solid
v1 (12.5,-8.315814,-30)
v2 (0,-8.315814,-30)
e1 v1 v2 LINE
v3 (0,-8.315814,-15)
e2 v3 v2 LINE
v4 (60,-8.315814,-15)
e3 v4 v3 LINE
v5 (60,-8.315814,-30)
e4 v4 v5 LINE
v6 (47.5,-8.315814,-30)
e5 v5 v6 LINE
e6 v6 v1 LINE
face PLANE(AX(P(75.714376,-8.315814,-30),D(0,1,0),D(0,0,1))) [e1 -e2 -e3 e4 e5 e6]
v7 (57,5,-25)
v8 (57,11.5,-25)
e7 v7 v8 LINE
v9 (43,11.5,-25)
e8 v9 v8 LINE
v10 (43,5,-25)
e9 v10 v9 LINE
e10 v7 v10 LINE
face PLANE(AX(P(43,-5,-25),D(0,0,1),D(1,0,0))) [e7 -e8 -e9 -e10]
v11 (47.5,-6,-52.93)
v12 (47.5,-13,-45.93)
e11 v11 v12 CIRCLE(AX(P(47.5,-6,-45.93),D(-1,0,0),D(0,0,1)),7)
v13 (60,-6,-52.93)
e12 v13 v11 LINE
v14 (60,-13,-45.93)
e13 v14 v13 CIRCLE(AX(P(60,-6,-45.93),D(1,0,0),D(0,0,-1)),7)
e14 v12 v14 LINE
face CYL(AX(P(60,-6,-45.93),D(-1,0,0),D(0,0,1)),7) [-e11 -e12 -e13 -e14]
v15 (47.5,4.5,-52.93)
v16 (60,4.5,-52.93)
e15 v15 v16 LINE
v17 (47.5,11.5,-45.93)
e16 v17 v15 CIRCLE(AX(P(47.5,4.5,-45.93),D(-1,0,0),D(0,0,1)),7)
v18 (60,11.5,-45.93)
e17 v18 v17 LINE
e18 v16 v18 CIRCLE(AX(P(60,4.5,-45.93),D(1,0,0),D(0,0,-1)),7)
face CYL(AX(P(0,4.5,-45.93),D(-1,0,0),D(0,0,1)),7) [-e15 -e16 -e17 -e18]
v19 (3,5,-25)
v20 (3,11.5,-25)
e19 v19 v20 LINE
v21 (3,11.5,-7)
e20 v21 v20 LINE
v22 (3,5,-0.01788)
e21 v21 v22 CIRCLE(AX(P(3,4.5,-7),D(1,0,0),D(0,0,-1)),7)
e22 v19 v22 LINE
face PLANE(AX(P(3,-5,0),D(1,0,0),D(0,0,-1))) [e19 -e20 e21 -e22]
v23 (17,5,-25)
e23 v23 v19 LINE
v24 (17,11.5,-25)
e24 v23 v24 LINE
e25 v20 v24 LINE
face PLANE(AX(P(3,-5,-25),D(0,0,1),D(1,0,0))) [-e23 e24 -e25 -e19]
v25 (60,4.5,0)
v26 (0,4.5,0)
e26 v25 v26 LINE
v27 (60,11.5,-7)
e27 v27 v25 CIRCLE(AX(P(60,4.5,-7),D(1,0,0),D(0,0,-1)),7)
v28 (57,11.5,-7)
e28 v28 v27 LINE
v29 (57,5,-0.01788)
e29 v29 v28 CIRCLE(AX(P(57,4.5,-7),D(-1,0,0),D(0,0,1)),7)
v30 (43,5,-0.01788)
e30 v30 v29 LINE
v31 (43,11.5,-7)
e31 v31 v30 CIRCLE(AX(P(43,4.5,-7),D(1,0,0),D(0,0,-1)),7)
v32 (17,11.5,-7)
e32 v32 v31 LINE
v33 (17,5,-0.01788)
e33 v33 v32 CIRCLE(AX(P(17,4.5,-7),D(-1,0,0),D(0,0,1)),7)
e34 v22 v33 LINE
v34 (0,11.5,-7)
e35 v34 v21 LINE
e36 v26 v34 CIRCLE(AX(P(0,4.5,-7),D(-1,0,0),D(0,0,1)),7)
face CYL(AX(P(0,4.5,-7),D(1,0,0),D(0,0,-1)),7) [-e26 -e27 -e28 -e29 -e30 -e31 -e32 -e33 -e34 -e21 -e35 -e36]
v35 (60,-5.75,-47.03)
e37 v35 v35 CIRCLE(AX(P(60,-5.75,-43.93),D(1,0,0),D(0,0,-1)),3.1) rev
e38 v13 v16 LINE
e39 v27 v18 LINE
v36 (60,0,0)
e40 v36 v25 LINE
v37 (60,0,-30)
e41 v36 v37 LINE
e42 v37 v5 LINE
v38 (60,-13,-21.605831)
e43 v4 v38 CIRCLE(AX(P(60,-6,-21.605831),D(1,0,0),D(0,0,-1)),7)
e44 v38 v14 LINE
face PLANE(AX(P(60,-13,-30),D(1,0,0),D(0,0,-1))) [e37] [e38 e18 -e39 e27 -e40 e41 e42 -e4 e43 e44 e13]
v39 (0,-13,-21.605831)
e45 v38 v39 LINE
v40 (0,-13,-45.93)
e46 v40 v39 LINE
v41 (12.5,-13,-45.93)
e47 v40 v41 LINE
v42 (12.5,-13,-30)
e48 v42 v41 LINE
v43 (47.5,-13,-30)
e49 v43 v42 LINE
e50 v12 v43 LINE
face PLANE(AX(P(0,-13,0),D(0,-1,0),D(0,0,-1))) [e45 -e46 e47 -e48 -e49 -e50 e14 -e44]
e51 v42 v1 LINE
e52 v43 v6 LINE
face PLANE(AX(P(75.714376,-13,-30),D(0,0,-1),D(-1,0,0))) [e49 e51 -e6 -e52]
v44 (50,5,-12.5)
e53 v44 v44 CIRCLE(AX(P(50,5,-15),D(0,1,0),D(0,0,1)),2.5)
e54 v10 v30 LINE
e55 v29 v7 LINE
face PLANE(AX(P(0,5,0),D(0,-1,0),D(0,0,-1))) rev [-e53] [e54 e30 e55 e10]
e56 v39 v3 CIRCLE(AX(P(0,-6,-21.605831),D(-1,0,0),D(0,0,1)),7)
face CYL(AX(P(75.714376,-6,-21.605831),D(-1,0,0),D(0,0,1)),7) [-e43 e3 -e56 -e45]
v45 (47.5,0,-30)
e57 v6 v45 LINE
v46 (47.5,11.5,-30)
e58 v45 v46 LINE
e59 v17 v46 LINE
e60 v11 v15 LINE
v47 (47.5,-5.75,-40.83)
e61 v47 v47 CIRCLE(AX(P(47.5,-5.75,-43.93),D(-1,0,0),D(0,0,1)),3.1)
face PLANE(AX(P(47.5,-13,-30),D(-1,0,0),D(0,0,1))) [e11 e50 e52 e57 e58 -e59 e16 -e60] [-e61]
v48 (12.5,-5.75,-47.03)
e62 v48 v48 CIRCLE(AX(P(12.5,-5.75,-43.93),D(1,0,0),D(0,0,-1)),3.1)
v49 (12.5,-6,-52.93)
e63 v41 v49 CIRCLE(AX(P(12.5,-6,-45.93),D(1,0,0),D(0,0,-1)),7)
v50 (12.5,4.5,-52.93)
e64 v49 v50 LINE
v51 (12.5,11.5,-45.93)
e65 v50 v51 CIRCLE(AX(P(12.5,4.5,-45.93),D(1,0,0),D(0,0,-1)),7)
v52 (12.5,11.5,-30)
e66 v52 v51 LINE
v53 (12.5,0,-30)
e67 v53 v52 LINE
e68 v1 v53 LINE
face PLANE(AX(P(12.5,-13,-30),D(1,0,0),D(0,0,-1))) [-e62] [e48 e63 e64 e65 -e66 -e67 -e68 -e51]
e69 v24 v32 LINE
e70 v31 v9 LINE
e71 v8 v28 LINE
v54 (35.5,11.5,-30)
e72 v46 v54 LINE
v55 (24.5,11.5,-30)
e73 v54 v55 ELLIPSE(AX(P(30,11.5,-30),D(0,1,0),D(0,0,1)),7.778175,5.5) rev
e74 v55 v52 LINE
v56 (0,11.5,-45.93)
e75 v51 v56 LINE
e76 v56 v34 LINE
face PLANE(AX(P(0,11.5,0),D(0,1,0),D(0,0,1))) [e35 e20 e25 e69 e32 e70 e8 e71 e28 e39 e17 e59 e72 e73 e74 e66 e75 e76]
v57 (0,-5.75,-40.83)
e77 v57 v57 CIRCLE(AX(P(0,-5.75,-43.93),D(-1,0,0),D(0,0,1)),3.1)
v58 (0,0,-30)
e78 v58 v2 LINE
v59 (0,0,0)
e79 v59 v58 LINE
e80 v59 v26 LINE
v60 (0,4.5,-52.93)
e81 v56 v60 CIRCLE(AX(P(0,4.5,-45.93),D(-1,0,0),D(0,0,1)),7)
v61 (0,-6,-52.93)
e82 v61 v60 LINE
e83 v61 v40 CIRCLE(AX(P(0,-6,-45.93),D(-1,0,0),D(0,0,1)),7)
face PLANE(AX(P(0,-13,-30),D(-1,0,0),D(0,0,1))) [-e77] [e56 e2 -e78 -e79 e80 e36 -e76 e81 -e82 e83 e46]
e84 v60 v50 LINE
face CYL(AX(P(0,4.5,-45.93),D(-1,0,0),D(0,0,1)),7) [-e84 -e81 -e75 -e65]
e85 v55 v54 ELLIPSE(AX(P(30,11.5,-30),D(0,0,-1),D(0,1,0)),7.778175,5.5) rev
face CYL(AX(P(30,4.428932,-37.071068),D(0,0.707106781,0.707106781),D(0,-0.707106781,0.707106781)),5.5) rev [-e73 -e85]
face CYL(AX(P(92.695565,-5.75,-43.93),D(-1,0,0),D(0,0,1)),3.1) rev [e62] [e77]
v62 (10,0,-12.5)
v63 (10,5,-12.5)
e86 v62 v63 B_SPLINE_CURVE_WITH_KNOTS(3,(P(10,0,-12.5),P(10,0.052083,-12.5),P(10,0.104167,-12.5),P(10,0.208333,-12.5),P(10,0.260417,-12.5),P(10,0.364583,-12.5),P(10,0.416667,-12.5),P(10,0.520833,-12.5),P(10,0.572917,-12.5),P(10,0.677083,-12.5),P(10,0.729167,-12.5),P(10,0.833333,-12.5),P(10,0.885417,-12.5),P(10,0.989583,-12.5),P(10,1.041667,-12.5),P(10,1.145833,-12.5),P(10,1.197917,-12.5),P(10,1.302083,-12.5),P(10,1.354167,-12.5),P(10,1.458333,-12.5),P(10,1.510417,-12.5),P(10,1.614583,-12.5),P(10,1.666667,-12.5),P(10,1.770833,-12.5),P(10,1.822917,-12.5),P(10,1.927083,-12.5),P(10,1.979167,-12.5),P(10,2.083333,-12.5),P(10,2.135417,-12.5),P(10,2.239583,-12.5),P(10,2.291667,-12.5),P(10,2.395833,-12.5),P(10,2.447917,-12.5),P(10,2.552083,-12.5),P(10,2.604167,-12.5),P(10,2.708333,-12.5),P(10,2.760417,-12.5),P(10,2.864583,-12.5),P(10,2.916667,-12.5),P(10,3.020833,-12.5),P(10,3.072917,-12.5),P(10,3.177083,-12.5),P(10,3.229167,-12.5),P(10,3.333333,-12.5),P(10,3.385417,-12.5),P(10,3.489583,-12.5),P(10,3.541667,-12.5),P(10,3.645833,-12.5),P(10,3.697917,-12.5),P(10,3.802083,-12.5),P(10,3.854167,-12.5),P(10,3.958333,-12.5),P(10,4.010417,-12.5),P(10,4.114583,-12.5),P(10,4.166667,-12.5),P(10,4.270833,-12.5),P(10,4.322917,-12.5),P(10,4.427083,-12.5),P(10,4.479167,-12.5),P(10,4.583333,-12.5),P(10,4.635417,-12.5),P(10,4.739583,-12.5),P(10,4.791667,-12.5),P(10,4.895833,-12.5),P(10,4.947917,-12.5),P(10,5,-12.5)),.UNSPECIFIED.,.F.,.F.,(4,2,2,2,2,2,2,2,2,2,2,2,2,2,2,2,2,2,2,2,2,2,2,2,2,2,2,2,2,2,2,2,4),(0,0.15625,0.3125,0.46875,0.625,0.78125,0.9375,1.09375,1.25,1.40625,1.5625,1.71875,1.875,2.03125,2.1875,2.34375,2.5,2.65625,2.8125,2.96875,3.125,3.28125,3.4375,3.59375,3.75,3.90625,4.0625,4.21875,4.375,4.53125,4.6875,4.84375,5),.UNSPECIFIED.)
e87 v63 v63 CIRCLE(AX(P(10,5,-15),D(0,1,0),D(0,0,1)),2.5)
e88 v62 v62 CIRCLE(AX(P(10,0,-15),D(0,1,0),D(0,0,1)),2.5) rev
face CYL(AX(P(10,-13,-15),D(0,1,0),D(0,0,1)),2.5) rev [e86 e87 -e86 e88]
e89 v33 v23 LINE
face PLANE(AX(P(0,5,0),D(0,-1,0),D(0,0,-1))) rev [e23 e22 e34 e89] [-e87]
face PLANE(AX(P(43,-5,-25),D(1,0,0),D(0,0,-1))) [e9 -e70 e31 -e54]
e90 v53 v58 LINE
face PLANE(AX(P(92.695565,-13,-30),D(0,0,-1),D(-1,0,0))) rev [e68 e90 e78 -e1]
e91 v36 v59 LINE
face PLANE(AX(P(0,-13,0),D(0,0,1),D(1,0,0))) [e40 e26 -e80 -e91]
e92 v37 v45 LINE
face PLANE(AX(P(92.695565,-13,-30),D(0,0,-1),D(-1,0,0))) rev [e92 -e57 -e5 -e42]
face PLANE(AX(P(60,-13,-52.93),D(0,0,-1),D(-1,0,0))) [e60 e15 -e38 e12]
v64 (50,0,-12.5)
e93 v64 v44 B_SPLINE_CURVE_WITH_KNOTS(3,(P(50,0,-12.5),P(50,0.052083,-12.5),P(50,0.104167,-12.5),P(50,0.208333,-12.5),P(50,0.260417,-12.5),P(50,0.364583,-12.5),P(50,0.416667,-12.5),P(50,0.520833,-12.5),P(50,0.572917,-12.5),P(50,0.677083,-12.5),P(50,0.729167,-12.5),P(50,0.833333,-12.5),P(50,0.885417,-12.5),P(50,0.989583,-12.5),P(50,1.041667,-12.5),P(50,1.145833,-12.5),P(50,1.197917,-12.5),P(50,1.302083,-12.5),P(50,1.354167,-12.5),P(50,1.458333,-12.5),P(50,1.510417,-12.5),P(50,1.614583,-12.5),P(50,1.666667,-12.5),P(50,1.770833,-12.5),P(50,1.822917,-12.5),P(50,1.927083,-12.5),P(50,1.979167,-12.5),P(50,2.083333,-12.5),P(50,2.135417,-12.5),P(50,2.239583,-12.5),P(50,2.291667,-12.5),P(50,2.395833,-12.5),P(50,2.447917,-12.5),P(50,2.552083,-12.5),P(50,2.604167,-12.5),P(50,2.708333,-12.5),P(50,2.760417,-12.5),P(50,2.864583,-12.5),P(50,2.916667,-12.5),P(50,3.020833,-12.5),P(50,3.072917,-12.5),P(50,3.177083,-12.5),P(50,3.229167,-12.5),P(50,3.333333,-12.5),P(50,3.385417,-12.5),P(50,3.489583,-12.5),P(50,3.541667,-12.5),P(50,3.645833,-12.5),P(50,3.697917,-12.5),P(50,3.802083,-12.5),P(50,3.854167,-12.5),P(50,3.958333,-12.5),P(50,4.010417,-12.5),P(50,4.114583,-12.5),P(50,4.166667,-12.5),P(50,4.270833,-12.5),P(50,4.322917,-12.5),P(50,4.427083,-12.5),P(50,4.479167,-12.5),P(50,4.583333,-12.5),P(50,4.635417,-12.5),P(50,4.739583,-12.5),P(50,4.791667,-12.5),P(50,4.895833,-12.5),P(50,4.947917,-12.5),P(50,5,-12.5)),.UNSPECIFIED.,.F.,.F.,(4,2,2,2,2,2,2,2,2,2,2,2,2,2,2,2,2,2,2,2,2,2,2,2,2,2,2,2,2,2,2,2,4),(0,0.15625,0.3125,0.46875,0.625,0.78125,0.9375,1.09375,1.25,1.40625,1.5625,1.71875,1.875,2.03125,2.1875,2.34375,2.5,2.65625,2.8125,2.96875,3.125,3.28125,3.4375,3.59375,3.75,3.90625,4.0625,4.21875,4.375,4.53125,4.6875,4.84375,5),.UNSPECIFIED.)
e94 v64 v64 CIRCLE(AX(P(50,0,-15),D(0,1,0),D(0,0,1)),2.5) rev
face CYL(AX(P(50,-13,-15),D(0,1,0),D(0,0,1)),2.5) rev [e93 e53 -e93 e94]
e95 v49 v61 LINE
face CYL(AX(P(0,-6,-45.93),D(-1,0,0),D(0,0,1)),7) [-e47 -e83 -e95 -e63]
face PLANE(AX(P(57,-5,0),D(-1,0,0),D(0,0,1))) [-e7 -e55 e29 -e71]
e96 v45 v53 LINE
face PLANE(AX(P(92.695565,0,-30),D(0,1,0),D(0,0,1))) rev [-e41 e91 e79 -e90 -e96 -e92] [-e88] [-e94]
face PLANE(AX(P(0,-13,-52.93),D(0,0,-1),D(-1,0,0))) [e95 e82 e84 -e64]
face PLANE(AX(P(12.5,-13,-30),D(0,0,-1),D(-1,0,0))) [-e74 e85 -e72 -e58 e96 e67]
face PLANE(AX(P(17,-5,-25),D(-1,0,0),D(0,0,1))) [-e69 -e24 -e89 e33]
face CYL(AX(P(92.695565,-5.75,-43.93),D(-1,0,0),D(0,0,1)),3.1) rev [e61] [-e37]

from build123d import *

# Parameters (mm, degrees)
SALIENTE_EXTRUIR1_DEPTH      = 5
SALIENTE_EXTRUIR1_DEPTH_BACK = 13
CROQUIS1_R                   = 2.5
SALIENTE_EXTRUIR2_DEPTH      = 6.5
SALIENTE_EXTRUIR2_DEPTH_BACK = 10
CORTAR_EXTRUIR2_REACH        = 83.059
CROQUIS4_R                   = 3.1
CROQUIS4_W                   = 30
CROQUIS4_H                   = 13
CORTAR_EXTRUIR3_DEPTH        = 10
CORTAR_EXTRUIR3_DEPTH_BACK   = 10
CROQUIS5_R                   = 5.5
SALIENTE_EXTRUIR3_REACH      = 83.059
CROQUIS6_W                   = 15
CROQUIS6_H                   = 4.684186211
REDONDEO1_R                  = 7


with BuildPart() as part:
    # Croquis1 → Saliente-Extruir1 (new, two sides: drawn at the far end of the back side and taken through both)
    with BuildSketch(Plane(origin=(0, 0, 0), x_dir=(1, 0, 0), z_dir=(0, 1, 0)).offset(-SALIENTE_EXTRUIR1_DEPTH_BACK)):
        Polygon((0, 0), (60, 0), (60, 30), (60, 52.93), (47.5, 52.93), (47.5, 30), (12.5, 30), (12.5, 52.93), (0, 52.93), (0, 30), align=None)
        with Locations(Location((10, 15, 0), (0, 0, 270))):
            Circle(CROQUIS1_R, mode=Mode.SUBTRACT)
        with Locations(Location((50, 15, 0), (0, 0, 270))):
            Circle(CROQUIS1_R, mode=Mode.SUBTRACT)
    extrude(amount=SALIENTE_EXTRUIR1_DEPTH + SALIENTE_EXTRUIR1_DEPTH_BACK)

    # Croquis2 → Saliente-Extruir2 (add, two sides: drawn at the far end of the back side and taken through both)
    with BuildSketch(Plane(origin=(0, 5, 0), x_dir=(1, 0, 0), z_dir=(0, 1, 0)).offset(-SALIENTE_EXTRUIR2_DEPTH_BACK)):
        Polygon((3, 0), (3, 25), (17, 25), (17, 0), (43, 0), (43, 25), (57, 25), (57, 0), (60, 0), (60, 52.93), (47.5, 52.93), (47.5, 30), (12.5, 30), (12.5, 52.93), (0, 52.93), (0, 0), align=None)
    extrude(amount=SALIENTE_EXTRUIR2_DEPTH + SALIENTE_EXTRUIR2_DEPTH_BACK)

    # Cortar-Extruir2: up to this face of the body (flat: up to its plane)
    cortar_extruir2_end = Plane(part.part.faces().sort_by_distance((60, -0.75, -26.465))[0])
    # Croquis4 → Cortar-Extruir2 (cut, up to the picked face)
    with BuildSketch(Plane.ZY, mode=Mode.PRIVATE) as cortar_extruir2_sk1:
        with Locations((-43.93, -5.75)):
            Circle(CROQUIS4_R)
    cortar_extruir2_tool1 = split(extrude(cortar_extruir2_sk1.sketch, amount=-CORTAR_EXTRUIR2_REACH, mode=Mode.PRIVATE), bisect_by=cortar_extruir2_end, keep=Keep.BOTH, mode=Mode.PRIVATE)
    # Croquis4 → Cortar-Extruir2 (cut, up to the picked face)
    with BuildSketch(Plane.ZY, mode=Mode.PRIVATE) as cortar_extruir2_sk2:
        with Locations((-15, -6.5)):
            Rectangle(CROQUIS4_W, CROQUIS4_H)
    cortar_extruir2_tool2 = split(extrude(cortar_extruir2_sk2.sketch, amount=-CORTAR_EXTRUIR2_REACH, mode=Mode.PRIVATE), bisect_by=cortar_extruir2_end, keep=Keep.BOTH, mode=Mode.PRIVATE)
    add(cortar_extruir2_tool1.solids().sort_by(Axis((0, -5.75, -43.93), (1, 0, 0)))[0], mode=Mode.SUBTRACT)
    add(cortar_extruir2_tool2.solids().sort_by(Axis((0, -6.5, -15), (1, 0, 0)))[0], mode=Mode.SUBTRACT)

    # Croquis5 → Cortar-Extruir3 (cut, two sides: drawn at the far end of the back side and taken through both)
    with BuildSketch(Plane(origin=(0, -9.25, -9.25), x_dir=(-1, 0, 0), z_dir=(0, -0.7071067811865488, -0.7071067811865464)).offset(-CORTAR_EXTRUIR3_DEPTH_BACK)):
        with Locations((-30, 29.344931419)):
            Circle(CROQUIS5_R)
    extrude(amount=CORTAR_EXTRUIR3_DEPTH + CORTAR_EXTRUIR3_DEPTH_BACK, mode=Mode.SUBTRACT)

    # Saliente-Extruir3: up to this face of the body (flat: up to its plane)
    saliente_extruir3_end = Plane(part.part.faces().sort_by_distance((60, 1.98040053, -30.964309834))[0])
    # Croquis6 → Saliente-Extruir3 (add, up to the picked face)
    with BuildSketch(Plane.ZY, mode=Mode.PRIVATE) as saliente_extruir3_sk1:
        with Locations((-22.5, -10.657906894)):
            Rectangle(CROQUIS6_W, CROQUIS6_H)
    saliente_extruir3_tool1 = split(extrude(saliente_extruir3_sk1.sketch, amount=-SALIENTE_EXTRUIR3_REACH, mode=Mode.PRIVATE), bisect_by=saliente_extruir3_end, keep=Keep.BOTH, mode=Mode.PRIVATE)
    add(saliente_extruir3_tool1.solids().sort_by(Axis((0, -10.657907, -22.5), (1, 0, 0)))[0])

    # Redondeo1
    # the kernel refuses this fillet: 7 mm, written as the material it takes off along each edge
    with BuildSketch(Plane(origin=(-16.514578123, -13, -15), x_dir=(0, 0, -1), z_dir=(1, 0, 0))) as redondeo1_piece_1:
        with BuildLine():
            CenterArc((6.605831249, 7), REDONDEO1_R, 199.319193713, 70.680806287)
            Line((0, 4.684186211), (0, 0))
            Line((0, 0), (6.605831249, 0))
        make_face()
    extrude(amount=93.029156246, mode=Mode.SUBTRACT)
    with BuildSketch(Plane(origin=(77.5, -13, -52.93), x_dir=(0, 1, 0), z_dir=(-1, 0, 0)), Plane(origin=(30, 11.5, -52.93), x_dir=(0, 0, 1), z_dir=(-1, 0, 0)), Plane(origin=(77.5, 11.5, -52.93), x_dir=(0, 0, 1), z_dir=(-1, 0, 0))) as redondeo1_piece_2:
        with BuildLine():
            CenterArc((REDONDEO1_R, -REDONDEO1_R), REDONDEO1_R, 90, 90)
            Line((0, -REDONDEO1_R), (0, 0))
            Line((0, 0), (REDONDEO1_R, 0))
        make_face()
    extrude(amount=47.5, mode=Mode.SUBTRACT)
    with BuildSketch(Plane(origin=(30, -13, -52.93), x_dir=(0, 0, 1), z_dir=(-1, 0, 0))) as redondeo1_piece_3:
        with BuildLine():
            CenterArc((REDONDEO1_R, REDONDEO1_R), REDONDEO1_R, 180, 90)
            Line((0, REDONDEO1_R), (0, 0))
            Line((0, 0), (REDONDEO1_R, 0))
        make_face()
    extrude(amount=47.5, mode=Mode.SUBTRACT)
    with BuildSketch(Plane(origin=(-17.5, 11.5, 0), x_dir=(0, -1, 0), z_dir=(1, 0, 0)), Plane(origin=(39.5, 11.5, 0), x_dir=(0, -1, 0), z_dir=(1, 0, 0))) as redondeo1_piece_4:
        with BuildLine():
            CenterArc((REDONDEO1_R, REDONDEO1_R), REDONDEO1_R, 180, 90)
            Line((0, REDONDEO1_R), (0, 0))
            Line((0, 0), (REDONDEO1_R, 0))
        make_face()
    extrude(amount=38, mode=Mode.SUBTRACT)
    with BuildSketch(Plane(origin=(-0.5, 11.5, 0), x_dir=(0, -1, 0), z_dir=(1, 0, 0))) as redondeo1_piece_5:
        with BuildLine():
            CenterArc((REDONDEO1_R, REDONDEO1_R), REDONDEO1_R, 180, 90)
            Line((0, REDONDEO1_R), (0, 0))
            Line((0, 0), (REDONDEO1_R, 0))
        make_face()
    extrude(amount=61, mode=Mode.SUBTRACT)


solid = part.part
